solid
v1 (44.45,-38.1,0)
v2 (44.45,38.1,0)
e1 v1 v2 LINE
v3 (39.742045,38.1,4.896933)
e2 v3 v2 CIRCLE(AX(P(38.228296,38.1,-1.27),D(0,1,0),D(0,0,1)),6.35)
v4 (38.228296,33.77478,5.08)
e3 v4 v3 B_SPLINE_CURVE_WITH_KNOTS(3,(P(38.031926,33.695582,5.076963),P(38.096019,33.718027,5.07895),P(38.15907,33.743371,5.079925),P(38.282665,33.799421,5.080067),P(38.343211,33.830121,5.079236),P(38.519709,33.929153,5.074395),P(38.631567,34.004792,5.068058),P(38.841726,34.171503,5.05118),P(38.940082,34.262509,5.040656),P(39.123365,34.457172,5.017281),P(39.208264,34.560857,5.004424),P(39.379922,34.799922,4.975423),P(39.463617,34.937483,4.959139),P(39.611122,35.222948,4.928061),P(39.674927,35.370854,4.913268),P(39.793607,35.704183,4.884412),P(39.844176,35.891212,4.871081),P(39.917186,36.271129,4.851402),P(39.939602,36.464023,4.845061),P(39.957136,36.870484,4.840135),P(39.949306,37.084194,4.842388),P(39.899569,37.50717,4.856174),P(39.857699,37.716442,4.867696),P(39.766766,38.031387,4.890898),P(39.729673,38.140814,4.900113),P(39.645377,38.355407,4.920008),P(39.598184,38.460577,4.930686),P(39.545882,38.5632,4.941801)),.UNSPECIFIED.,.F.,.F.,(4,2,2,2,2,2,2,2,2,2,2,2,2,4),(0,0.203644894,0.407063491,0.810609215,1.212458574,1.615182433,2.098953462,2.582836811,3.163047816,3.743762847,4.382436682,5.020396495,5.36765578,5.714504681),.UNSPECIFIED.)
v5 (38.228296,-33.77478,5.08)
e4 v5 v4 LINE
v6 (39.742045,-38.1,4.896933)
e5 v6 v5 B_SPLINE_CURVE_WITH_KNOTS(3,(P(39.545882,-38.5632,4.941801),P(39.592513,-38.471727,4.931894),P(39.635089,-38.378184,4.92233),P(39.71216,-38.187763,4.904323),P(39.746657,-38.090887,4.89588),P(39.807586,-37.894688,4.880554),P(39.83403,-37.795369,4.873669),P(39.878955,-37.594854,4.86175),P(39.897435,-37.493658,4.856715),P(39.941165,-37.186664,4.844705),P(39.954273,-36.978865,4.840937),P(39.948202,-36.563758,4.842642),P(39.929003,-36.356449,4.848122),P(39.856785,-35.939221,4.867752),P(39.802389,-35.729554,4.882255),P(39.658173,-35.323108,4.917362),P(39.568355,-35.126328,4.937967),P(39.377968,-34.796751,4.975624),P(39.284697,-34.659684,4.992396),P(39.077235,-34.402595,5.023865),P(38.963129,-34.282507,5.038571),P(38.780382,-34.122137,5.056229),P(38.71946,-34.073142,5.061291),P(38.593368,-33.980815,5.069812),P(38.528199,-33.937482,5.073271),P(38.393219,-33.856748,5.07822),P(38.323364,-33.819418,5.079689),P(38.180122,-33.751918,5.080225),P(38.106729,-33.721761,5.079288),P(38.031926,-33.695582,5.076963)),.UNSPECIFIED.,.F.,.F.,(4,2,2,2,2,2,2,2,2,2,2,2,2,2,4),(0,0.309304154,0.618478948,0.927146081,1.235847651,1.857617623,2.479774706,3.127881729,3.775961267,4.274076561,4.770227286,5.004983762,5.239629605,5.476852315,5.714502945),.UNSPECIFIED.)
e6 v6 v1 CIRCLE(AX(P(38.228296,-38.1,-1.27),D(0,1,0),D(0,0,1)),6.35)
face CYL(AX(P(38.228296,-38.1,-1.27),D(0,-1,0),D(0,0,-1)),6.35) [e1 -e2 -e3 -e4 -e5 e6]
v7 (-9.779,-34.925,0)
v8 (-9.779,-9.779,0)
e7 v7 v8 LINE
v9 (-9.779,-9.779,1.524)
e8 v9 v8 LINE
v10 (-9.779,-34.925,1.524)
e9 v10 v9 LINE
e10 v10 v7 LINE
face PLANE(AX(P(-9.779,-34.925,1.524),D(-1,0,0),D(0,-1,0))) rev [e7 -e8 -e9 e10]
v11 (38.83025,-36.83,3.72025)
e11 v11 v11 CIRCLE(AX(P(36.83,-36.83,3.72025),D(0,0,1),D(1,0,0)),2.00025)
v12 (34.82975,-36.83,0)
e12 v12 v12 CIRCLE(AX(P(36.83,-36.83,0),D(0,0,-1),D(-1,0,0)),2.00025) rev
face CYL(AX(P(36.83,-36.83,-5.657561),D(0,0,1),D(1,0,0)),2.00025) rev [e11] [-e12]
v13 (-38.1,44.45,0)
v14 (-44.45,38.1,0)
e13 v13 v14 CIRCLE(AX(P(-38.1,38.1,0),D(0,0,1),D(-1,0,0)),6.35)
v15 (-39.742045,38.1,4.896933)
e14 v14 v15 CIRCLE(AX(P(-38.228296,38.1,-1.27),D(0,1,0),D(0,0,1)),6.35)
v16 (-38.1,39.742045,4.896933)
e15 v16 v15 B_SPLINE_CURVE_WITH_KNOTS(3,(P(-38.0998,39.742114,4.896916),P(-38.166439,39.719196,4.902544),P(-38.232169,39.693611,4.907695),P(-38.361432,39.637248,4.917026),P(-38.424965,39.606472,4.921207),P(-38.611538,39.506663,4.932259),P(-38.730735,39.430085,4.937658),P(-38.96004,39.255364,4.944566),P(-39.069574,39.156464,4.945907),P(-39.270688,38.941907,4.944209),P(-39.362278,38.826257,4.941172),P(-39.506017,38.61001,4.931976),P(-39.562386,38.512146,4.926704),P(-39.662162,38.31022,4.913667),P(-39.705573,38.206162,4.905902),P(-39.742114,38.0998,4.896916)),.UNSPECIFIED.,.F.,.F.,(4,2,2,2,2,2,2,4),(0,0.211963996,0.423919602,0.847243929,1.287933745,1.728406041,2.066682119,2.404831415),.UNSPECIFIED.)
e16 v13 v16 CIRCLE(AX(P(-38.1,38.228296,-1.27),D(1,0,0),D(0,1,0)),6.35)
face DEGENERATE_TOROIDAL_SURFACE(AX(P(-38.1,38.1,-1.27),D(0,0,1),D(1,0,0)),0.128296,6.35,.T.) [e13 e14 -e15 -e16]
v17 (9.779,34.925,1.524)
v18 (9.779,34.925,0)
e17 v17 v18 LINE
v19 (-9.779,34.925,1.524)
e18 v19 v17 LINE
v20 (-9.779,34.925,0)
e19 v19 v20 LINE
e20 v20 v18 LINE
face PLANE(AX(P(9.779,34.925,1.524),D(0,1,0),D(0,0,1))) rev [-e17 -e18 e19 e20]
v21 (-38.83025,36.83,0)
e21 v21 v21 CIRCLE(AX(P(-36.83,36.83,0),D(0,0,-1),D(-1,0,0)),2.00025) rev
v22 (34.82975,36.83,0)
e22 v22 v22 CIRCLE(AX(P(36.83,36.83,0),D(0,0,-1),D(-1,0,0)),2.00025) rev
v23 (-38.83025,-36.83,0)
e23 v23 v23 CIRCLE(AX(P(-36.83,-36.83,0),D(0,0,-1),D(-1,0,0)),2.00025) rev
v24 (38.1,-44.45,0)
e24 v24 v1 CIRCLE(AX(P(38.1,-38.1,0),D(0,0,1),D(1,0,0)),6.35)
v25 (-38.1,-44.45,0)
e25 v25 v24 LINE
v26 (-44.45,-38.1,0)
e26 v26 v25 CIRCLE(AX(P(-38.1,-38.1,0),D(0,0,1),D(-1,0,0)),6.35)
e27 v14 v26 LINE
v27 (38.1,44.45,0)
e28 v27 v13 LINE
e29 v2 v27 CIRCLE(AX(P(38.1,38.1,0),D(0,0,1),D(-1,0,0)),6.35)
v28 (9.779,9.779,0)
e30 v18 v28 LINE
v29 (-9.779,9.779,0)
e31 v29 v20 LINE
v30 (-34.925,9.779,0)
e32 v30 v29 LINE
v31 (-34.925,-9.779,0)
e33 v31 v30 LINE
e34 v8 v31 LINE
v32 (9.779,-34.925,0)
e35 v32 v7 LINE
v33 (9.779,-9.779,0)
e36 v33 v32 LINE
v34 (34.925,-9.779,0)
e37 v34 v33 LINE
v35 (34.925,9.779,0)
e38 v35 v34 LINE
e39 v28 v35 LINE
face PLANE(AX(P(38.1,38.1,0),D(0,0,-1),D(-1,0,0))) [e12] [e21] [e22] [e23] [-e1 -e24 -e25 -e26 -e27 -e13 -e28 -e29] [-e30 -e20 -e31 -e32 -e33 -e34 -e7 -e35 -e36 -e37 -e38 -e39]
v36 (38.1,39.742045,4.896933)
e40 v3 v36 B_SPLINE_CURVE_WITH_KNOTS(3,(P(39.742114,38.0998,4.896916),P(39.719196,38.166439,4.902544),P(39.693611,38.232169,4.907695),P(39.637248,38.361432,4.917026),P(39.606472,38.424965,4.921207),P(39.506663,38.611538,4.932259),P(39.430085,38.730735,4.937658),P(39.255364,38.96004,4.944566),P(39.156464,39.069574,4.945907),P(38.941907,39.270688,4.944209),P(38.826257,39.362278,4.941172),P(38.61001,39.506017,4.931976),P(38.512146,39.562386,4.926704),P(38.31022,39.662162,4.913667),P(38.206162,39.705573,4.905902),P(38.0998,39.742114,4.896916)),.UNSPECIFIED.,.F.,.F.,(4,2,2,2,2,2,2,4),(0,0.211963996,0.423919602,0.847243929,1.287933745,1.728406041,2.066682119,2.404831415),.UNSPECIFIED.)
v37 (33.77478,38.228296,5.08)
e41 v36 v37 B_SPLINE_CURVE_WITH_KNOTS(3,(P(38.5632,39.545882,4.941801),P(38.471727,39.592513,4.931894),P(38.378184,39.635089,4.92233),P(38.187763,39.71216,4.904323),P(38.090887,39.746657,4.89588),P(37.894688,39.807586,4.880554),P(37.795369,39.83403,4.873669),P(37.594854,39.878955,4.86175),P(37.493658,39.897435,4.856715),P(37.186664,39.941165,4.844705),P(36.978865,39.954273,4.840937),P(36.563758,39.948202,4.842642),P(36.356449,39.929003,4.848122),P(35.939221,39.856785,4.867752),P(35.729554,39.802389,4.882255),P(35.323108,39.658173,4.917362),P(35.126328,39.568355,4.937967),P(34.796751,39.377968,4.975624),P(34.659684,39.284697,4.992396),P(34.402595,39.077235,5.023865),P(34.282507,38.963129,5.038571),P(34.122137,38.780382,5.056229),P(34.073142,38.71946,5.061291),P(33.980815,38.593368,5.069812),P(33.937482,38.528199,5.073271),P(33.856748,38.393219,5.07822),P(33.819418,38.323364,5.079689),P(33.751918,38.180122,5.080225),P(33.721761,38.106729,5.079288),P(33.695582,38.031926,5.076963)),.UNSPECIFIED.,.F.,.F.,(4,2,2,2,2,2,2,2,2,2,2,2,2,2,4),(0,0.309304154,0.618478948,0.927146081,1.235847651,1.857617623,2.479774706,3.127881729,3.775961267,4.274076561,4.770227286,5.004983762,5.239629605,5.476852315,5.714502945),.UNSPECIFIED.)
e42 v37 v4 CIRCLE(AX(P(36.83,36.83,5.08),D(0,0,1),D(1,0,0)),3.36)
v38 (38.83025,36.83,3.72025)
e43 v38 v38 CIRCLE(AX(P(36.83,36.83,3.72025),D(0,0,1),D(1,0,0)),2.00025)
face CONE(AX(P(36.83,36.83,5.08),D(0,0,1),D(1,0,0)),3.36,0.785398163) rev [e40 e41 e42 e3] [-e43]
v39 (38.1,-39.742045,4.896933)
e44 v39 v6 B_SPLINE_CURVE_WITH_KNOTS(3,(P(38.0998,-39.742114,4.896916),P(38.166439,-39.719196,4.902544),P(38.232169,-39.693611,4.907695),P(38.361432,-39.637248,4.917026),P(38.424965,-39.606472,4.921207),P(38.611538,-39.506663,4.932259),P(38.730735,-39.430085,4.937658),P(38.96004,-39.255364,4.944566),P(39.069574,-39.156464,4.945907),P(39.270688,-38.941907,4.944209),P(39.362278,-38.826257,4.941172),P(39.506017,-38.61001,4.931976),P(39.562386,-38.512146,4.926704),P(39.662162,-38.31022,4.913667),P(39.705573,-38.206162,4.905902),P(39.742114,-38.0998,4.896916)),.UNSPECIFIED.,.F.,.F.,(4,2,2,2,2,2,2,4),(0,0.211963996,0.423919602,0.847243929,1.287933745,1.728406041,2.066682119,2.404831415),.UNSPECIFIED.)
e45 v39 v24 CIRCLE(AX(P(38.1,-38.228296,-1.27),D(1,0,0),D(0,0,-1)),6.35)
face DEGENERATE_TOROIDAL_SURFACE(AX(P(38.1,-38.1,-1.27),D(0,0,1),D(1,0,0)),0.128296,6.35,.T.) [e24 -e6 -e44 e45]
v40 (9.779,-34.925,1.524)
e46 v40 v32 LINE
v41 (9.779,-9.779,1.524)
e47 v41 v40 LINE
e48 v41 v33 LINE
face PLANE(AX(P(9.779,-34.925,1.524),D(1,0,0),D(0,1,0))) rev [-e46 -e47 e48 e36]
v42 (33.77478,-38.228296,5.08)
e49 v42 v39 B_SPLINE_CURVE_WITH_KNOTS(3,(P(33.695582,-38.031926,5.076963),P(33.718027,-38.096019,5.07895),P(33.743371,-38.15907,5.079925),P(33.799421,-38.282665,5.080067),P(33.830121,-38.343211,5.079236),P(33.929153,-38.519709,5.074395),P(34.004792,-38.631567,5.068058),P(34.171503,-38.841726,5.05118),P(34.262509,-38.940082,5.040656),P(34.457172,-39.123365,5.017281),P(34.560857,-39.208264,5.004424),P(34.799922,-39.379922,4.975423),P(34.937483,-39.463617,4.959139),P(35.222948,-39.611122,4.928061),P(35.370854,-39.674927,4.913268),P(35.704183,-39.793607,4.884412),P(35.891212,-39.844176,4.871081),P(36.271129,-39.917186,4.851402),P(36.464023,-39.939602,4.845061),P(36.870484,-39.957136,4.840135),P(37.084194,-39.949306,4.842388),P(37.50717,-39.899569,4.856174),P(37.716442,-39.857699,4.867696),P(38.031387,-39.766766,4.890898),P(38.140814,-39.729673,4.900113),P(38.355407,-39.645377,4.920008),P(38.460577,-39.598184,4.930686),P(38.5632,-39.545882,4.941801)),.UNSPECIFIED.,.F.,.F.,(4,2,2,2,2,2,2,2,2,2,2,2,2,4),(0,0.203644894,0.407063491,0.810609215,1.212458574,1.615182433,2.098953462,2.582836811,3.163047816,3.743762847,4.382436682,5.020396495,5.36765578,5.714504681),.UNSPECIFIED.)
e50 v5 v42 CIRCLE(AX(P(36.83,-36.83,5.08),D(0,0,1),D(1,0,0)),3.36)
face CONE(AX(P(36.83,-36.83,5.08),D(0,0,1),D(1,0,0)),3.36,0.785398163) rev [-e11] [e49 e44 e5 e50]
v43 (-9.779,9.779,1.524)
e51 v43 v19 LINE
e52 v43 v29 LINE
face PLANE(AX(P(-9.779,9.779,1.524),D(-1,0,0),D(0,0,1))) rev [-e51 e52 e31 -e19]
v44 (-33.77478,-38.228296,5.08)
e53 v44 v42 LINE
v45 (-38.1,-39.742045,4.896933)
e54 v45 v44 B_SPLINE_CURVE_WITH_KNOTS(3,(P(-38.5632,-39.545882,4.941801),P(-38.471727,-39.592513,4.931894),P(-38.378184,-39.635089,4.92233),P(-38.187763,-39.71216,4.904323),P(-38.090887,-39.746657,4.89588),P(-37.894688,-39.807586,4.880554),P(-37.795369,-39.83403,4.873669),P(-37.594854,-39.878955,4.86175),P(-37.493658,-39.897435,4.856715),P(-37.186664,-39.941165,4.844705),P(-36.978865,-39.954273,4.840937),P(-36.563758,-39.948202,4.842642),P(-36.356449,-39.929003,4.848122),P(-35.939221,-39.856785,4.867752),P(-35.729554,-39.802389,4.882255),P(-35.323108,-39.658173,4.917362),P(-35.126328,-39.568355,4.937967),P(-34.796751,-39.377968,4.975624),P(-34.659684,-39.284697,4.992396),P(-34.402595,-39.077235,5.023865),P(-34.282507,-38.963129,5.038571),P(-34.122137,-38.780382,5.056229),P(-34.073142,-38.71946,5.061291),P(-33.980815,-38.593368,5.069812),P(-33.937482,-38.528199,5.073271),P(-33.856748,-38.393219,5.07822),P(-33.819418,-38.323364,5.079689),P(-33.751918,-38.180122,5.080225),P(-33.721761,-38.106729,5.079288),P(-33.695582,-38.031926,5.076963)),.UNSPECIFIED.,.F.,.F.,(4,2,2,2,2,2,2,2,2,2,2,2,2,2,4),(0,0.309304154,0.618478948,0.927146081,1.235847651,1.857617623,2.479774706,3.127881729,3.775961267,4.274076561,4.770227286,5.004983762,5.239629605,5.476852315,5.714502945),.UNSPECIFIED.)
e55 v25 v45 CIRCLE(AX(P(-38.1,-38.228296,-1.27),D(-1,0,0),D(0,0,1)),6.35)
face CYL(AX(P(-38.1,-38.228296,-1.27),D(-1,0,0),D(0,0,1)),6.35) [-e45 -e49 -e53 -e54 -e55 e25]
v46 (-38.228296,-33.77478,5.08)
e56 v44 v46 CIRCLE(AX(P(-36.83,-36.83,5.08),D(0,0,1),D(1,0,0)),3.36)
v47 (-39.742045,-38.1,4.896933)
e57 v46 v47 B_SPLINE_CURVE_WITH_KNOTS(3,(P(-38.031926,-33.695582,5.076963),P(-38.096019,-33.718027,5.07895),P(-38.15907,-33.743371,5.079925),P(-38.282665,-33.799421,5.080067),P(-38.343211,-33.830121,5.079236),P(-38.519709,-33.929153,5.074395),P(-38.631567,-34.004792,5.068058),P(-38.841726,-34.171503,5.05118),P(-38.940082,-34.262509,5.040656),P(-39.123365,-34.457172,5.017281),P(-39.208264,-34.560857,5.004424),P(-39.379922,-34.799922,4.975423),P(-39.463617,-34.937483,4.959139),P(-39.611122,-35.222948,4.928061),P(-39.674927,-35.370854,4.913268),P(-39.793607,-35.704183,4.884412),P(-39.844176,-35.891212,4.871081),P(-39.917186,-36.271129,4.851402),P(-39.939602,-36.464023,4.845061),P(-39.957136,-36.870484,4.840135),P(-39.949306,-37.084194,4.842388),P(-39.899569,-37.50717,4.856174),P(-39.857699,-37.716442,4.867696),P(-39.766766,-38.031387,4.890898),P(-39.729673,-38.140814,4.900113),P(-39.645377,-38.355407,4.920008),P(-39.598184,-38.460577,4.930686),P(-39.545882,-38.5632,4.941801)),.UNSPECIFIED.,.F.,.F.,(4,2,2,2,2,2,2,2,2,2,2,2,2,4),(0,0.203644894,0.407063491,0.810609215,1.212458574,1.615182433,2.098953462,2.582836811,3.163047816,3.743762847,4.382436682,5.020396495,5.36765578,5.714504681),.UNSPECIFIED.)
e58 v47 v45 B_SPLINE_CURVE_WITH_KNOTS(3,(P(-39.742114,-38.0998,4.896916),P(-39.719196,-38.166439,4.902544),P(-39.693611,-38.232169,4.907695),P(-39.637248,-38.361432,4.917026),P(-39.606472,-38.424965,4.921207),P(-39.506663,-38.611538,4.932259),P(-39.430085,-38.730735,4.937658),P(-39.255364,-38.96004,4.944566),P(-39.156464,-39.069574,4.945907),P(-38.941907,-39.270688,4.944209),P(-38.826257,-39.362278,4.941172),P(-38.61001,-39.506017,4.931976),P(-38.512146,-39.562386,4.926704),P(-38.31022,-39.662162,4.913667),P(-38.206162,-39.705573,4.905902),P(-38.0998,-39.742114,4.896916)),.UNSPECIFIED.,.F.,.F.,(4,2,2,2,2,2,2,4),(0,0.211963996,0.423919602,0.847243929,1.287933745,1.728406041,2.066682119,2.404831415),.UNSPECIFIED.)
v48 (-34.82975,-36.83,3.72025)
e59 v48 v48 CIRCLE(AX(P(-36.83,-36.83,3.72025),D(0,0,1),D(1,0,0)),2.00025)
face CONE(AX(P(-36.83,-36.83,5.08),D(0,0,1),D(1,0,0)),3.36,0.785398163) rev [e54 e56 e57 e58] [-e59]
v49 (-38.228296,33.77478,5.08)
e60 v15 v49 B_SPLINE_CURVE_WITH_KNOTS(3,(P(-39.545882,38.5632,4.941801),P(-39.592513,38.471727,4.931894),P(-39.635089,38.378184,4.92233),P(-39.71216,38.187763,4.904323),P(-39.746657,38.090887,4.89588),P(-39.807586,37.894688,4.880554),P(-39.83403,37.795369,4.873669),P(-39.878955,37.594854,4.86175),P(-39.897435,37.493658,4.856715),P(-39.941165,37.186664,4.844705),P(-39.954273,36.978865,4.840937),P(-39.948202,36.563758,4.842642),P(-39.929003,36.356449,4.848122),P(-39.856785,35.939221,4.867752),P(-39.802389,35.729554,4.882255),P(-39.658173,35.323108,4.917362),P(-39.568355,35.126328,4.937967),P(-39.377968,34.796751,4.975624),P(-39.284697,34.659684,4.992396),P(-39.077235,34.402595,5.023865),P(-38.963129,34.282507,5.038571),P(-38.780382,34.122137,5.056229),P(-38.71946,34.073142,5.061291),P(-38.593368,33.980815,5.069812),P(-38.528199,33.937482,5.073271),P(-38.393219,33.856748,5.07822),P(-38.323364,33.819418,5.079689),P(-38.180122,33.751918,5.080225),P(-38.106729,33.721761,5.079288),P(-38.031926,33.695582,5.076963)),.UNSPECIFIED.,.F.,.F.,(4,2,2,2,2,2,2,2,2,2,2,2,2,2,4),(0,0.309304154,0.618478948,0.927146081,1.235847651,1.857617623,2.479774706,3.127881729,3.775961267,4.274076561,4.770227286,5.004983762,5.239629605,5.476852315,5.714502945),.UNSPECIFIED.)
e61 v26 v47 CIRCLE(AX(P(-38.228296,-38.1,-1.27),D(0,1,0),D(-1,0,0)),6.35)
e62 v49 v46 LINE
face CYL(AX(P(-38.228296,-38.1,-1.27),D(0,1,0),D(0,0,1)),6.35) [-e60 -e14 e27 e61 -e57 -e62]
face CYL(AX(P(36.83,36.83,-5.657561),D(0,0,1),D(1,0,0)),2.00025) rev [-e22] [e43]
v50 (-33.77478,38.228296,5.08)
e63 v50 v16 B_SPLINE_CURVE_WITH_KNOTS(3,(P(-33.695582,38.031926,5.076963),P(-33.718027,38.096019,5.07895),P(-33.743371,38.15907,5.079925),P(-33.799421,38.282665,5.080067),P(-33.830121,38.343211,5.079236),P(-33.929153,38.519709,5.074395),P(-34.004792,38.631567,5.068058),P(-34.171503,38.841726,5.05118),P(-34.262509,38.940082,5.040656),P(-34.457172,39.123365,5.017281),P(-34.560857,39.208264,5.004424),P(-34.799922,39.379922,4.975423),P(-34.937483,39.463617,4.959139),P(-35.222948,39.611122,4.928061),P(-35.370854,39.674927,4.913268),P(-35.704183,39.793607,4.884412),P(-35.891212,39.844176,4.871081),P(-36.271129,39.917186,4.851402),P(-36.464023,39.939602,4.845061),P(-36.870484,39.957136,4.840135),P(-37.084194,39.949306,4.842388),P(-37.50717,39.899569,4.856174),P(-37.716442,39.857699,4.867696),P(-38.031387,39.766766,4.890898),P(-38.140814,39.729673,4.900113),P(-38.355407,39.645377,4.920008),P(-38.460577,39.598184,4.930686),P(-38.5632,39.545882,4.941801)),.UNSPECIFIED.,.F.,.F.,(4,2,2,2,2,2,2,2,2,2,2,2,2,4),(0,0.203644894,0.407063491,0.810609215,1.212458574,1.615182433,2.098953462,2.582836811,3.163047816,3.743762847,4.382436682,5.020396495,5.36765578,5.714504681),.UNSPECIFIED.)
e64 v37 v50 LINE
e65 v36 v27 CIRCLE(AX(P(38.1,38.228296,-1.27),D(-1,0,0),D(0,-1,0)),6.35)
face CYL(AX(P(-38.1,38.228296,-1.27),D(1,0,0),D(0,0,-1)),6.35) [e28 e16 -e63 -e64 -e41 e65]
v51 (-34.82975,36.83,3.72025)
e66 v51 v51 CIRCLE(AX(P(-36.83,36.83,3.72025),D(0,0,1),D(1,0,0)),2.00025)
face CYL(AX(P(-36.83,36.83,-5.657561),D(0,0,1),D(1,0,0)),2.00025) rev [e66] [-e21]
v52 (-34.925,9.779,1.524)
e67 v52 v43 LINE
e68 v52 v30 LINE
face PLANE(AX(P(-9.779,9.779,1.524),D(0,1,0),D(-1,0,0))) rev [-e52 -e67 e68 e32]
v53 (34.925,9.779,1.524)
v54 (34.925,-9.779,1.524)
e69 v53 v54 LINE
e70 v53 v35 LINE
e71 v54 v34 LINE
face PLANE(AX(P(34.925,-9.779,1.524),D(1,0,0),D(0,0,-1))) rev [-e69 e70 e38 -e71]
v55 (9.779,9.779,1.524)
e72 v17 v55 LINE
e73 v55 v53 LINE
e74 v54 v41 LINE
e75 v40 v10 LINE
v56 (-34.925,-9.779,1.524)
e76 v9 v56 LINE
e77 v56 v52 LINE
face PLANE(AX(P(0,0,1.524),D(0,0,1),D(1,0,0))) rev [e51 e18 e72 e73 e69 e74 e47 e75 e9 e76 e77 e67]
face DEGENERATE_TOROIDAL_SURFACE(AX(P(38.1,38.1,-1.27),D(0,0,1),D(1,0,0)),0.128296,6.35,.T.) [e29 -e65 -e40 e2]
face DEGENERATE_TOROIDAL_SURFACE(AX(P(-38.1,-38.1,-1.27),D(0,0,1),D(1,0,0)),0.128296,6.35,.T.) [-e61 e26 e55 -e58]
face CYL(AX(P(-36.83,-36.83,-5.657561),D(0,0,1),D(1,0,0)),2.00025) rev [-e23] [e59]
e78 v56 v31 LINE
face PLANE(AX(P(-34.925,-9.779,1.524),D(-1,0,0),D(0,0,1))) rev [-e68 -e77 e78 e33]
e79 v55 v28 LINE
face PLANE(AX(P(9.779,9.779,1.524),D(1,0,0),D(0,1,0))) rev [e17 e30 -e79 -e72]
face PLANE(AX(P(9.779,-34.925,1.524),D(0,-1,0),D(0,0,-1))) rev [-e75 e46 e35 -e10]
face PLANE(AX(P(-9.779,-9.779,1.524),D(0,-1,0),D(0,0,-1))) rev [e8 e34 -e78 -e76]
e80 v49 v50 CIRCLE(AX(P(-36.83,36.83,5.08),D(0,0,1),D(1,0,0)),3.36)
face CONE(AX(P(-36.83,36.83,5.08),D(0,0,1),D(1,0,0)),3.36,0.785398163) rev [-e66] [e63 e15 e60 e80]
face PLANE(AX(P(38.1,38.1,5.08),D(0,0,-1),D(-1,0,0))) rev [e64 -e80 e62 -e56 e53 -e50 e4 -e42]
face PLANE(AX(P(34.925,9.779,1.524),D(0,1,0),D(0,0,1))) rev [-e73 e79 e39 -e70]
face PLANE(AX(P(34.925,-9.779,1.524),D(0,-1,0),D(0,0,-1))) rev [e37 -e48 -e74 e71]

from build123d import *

# Parameters (mm, degrees)
BOSS_EXTRUDE1_DEPTH                                  = 5.08
FILLET1_R                                            = 6.35
SKETCH2_R                                            = 2.00025
CUT_EXTRUDE1_DEPTH                                   = 5.08
CUT_EXTRUDE2_DEPTH                                   = 1.524
CSK_FOR_M3_HEX_SOCKET_COUNTERSUNK_CAP_SC_D           = 3.4
CSK_FOR_M3_HEX_SOCKET_COUNTERSUNK_CAP_SC_CSINK_D     = 6.72
CSK_FOR_M3_HEX_SOCKET_COUNTERSUNK_CAP_SC_CSINK_ANGLE = 90


with BuildPart() as part:
    # Sketch1 → Boss-Extrude1 (new body)
    with BuildSketch(Plane.XY):
        with BuildLine():
            Line((-38.1, -44.45), (38.1, -44.45))
            ThreePointArc((38.1, -44.45), (42.590128061, -42.590128061), (44.45, -38.1))
            Line((44.45, -38.1), (44.45, 38.1))
            ThreePointArc((44.45, 38.1), (42.590128061, 42.590128061), (38.1, 44.45))
            Line((38.1, 44.45), (-38.1, 44.45))
            ThreePointArc((-38.1, 44.45), (-42.590128061, 42.590128061), (-44.45, 38.1))
            Line((-44.45, 38.1), (-44.45, -38.1))
            ThreePointArc((-44.45, -38.1), (-42.590128061, -42.590128061), (-38.1, -44.45))
        make_face()
    extrude(amount=BOSS_EXTRUDE1_DEPTH)

    # Fillet1
    # the kernel refuses this fillet: 6.35 mm, written as the material it takes off along each edge
    with BuildSketch(Plane(origin=(38.1, 44.45, 5.08), x_dir=(0, -1.563753501140824e-12, -1.0), z_dir=(-1, 0, 0)), Plane(origin=(44.45, -38.1, 5.08), x_dir=(-1.563753501140824e-12, 0, -1.0), z_dir=(0, 1, 0)), Plane(origin=(-38.1, -44.45, 5.08), x_dir=(0, 1.563753501140824e-12, -1.0), z_dir=(1, 0, 0)), Plane(origin=(-44.45, 38.1, 5.08), x_dir=(1.563753501140824e-12, 0, -1.0), z_dir=(0, -1, 0))) as fillet1_piece_1:
        with BuildLine():
            CenterArc((6.35, 6.221703947), FILLET1_R, 180, 78.463040967)
            Line((0, 6.221703947), (-0.127, 6.221703947))
            Line((-0.127, 6.221703947), (-0.127, 0))
            Line((-0.127, 0), (0, -0.127))
            ThreePointArc((0, -0.127), (2.54, -0.127), (5.0546, -0.124434079))
            Line((5.0546, -0.124434079), (5.08, 0))
        make_face()
    extrude(amount=76.2, mode=Mode.SUBTRACT)
    with BuildSketch(Plane(origin=(38.1, 38.1, 5.08), x_dir=(1, 0, 0), z_dir=(0, -1, 0))) as fillet1_piece_2:
        with BuildLine():
            CenterArc((0.128296053, -6.35), FILLET1_R, 11.536959033, 78.463040967)
            Line((0.128296053, 0), (0.128296053, 0.127))
            Line((0.128296053, 0.127), (6.35, 0.127))
            Line((6.35, 0.127), (6.477, 0))
            ThreePointArc((6.477, 0), (6.477, -2.54), (6.474434079, -5.0546))
            Line((6.474434079, -5.0546), (6.35, -5.08))
        make_face()
    revolve(axis=Axis((38.1, 38.1, 5.08), (0, 0, 1)), revolution_arc=90, mode=Mode.SUBTRACT)
    with BuildSketch(Plane(origin=(38.1, -38.1, 5.08), x_dir=(0, -1, 0), z_dir=(-1, 0, 0))) as fillet1_piece_3:
        with BuildLine():
            CenterArc((0.128296053, -6.35), FILLET1_R, 11.536959033, 78.463040967)
            Line((0.128296053, 0), (0.128296053, 0.127))
            Line((0.128296053, 0.127), (6.35, 0.127))
            Line((6.35, 0.127), (6.477, 0))
            ThreePointArc((6.477, 0), (6.477, -2.54), (6.474434079, -5.0546))
            Line((6.474434079, -5.0546), (6.35, -5.08))
        make_face()
    revolve(axis=Axis((38.1, -38.1, 5.08), (0, 0, 1)), revolution_arc=90, mode=Mode.SUBTRACT)
    with BuildSketch(Plane(origin=(-38.1, -38.1, 5.08), x_dir=(-1, 0, 0), z_dir=(0, 1, 0))) as fillet1_piece_4:
        with BuildLine():
            CenterArc((0.128296053, -6.35), FILLET1_R, 11.536959033, 78.463040967)
            Line((0.128296053, 0), (0.128296053, 0.127))
            Line((0.128296053, 0.127), (6.35, 0.127))
            Line((6.35, 0.127), (6.477, 0))
            ThreePointArc((6.477, 0), (6.477, -2.54), (6.474434079, -5.0546))
            Line((6.474434079, -5.0546), (6.35, -5.08))
        make_face()
    revolve(axis=Axis((-38.1, -38.1, 5.08), (0, 0, 1)), revolution_arc=90, mode=Mode.SUBTRACT)
    with BuildSketch(Plane(origin=(-38.1, 38.1, 5.08), x_dir=(0, 1, 0), z_dir=(1, 0, 0))) as fillet1_piece_5:
        with BuildLine():
            CenterArc((0.128296053, -6.35), FILLET1_R, 11.536959033, 78.463040967)
            Line((0.128296053, 0), (0.128296053, 0.127))
            Line((0.128296053, 0.127), (6.35, 0.127))
            Line((6.35, 0.127), (6.477, 0))
            ThreePointArc((6.477, 0), (6.477, -2.54), (6.474434079, -5.0546))
            Line((6.474434079, -5.0546), (6.35, -5.08))
        make_face()
    revolve(axis=Axis((-38.1, 38.1, 5.08), (0, 0, 1)), revolution_arc=90, mode=Mode.SUBTRACT)

    # Sketch2 → Cut-Extrude1 (cut)
    with BuildSketch(Plane.XY.offset(5.08)):
        with Locations(Location((-36.83, 36.83, 0), (0, 0, 44.351687845))):
            Circle(SKETCH2_R)
        with Locations(Location((36.83, 36.83, 0), (0, 0, 39.414098339))):
            Circle(SKETCH2_R)
        with Locations(Location((36.83, -36.83, 0), (0, 0, 320.585901644))):
            Circle(SKETCH2_R)
        with Locations(Location((-36.83, -36.83, 0), (0, 0, 315.648312155))):
            Circle(SKETCH2_R)
    extrude(amount=-CUT_EXTRUDE1_DEPTH, mode=Mode.SUBTRACT)

    # Sketch4 → Cut-Extrude2 (cut)
    with BuildSketch(Plane(origin=(0, 0, 0), x_dir=(-1, 0, 0), z_dir=(0, 0, -1))):
        Polygon((-9.779, 9.779), (-9.779, 34.925), (9.779, 34.925), (9.779, 9.779), (34.925, 9.779), (34.925, -9.779), (9.779, -9.779), (9.779, -34.925), (-9.779, -34.925), (-9.779, -9.779), (-34.925, -9.779), (-34.925, 9.779), align=None)
    extrude(amount=-CUT_EXTRUDE2_DEPTH, mode=Mode.SUBTRACT)

    # CSK for M3 Hex Socket Countersunk Cap Screw1 (through all)
    with Locations(Plane.XY.offset(5.08)):
        with Locations((-36.83, 36.83), (36.83, 36.83), (36.83, -36.83), (-36.83, -36.83)):
            CounterSinkHole(CSK_FOR_M3_HEX_SOCKET_COUNTERSUNK_CAP_SC_D / 2, CSK_FOR_M3_HEX_SOCKET_COUNTERSUNK_CAP_SC_CSINK_D / 2, counter_sink_angle=CSK_FOR_M3_HEX_SOCKET_COUNTERSUNK_CAP_SC_CSINK_ANGLE)


solid = part.part
